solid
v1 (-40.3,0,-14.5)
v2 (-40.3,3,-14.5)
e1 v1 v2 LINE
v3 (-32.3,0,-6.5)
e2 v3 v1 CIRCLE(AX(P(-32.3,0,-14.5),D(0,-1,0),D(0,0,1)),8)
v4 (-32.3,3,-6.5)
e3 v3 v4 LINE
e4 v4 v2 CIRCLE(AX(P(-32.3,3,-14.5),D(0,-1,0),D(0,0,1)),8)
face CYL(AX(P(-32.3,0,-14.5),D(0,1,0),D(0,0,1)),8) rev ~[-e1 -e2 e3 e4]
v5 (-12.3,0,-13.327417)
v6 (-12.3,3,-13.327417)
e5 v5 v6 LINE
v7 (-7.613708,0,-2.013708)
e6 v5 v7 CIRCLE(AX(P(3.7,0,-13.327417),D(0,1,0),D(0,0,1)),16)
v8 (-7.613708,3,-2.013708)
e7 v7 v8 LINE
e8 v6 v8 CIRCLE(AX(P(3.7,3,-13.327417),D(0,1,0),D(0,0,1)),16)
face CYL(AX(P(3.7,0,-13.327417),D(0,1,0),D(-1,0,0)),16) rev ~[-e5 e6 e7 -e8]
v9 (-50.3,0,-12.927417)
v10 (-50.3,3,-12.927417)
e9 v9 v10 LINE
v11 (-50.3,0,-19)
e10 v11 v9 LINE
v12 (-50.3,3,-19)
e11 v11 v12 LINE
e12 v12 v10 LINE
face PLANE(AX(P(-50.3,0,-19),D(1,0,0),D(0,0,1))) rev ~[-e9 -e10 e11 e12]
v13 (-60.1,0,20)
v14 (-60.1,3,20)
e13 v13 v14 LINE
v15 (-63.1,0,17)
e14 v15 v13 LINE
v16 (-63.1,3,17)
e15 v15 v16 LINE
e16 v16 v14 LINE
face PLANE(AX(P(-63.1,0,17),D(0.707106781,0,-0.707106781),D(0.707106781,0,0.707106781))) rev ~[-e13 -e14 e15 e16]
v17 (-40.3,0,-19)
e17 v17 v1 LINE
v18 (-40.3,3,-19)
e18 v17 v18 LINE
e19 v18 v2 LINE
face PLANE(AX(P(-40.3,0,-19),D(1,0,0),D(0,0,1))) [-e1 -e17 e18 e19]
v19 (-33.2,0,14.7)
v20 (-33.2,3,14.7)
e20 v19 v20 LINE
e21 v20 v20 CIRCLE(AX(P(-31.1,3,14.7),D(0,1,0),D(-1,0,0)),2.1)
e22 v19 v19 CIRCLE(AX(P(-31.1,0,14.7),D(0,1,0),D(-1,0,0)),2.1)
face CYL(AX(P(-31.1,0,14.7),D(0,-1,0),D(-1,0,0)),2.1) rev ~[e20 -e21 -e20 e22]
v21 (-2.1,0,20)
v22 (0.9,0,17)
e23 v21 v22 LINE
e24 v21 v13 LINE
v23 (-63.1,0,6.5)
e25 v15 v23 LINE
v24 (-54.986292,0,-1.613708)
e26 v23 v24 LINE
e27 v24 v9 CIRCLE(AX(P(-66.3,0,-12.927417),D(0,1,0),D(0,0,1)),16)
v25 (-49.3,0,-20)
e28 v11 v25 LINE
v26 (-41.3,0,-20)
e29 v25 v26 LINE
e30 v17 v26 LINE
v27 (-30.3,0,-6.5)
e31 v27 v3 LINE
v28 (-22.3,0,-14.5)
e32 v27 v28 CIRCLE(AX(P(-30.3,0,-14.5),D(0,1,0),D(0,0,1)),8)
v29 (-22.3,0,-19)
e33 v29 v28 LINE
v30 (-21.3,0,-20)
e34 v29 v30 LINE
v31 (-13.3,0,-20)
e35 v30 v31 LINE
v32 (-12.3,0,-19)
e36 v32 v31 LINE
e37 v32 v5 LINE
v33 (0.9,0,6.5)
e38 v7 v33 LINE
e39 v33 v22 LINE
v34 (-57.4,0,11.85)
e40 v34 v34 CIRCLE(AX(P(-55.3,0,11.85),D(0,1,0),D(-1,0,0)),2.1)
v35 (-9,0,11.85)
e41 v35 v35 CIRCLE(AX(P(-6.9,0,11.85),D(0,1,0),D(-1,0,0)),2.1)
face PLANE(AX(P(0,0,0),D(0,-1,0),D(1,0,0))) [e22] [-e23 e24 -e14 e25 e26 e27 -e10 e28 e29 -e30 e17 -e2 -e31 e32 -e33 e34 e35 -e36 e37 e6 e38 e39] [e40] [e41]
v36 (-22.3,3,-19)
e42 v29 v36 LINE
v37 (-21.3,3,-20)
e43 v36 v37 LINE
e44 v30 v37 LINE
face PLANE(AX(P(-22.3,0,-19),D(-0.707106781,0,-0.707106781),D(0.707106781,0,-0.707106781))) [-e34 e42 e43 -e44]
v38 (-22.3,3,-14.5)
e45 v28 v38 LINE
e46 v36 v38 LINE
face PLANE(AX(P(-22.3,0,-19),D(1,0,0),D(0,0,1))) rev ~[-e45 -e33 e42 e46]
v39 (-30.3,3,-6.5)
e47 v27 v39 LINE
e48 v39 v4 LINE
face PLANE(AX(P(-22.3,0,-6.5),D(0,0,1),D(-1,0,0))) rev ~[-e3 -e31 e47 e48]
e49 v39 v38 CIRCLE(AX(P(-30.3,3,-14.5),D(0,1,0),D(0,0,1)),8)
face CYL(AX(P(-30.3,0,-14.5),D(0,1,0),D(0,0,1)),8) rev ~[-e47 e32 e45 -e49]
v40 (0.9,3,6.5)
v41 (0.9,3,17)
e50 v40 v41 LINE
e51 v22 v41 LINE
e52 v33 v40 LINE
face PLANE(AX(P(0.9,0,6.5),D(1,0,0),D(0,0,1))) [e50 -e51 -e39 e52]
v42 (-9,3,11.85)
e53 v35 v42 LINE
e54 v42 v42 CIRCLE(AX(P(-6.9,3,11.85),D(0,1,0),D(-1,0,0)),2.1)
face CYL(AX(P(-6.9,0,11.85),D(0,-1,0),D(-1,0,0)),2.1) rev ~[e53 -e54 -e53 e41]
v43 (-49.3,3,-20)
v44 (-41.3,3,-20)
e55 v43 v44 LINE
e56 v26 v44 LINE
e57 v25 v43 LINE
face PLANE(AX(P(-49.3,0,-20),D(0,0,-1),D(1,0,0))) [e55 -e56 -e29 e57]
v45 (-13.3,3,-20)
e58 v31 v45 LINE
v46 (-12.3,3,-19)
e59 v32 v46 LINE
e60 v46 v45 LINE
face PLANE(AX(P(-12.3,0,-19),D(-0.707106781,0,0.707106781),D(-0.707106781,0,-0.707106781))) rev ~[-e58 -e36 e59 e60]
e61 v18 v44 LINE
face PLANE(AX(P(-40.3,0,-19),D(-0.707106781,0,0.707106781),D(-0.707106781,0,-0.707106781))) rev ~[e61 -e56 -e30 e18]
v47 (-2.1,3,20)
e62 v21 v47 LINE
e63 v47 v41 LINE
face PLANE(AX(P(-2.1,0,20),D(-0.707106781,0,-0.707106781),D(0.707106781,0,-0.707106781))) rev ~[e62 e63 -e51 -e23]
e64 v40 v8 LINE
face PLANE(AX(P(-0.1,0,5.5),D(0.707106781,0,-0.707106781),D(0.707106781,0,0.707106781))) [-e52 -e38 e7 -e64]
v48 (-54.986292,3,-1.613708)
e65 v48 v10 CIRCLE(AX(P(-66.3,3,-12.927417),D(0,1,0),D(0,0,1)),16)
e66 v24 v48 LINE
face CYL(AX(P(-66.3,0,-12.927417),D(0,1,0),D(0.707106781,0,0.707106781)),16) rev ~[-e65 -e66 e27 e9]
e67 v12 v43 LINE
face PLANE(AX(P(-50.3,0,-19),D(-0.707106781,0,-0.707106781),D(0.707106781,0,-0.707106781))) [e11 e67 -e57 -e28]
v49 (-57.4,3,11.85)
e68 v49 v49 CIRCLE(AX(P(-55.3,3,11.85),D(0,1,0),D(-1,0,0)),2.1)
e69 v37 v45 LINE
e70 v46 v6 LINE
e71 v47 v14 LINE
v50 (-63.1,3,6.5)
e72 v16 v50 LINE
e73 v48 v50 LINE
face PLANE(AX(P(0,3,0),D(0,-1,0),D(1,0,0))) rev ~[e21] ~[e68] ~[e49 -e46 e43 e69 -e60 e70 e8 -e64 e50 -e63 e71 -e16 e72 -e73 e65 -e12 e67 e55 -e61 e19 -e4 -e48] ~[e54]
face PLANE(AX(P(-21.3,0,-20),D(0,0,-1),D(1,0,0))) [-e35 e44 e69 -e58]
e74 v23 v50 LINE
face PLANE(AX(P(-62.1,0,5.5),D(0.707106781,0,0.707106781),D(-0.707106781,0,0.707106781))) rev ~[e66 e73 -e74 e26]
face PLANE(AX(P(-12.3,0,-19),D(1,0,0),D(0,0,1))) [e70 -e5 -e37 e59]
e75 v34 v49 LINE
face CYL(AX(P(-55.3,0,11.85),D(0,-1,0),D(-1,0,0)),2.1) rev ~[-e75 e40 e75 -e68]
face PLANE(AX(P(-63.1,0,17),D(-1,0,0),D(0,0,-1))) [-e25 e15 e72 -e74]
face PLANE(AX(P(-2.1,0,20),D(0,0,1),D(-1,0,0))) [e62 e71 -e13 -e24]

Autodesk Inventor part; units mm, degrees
ref_plane "YZ Plane" through (0, 0, 0) normal (1, 0, 0) x (0, 1, 0)
ref_plane "XZ Plane" through (0, 0, 0) normal (0, 1, 0) x (-1, 0, 0)
ref_plane "XY Plane" through (0, 0, 0) normal (0, 0, 1) x (1, 0, 0)
sketch "スケッチ3" plane through (0, 0, 0) normal (0, 1, 0) x (-1, 0, 0)
  circle A0 centre (55.3, 11.85) radius 2.1
  circle A1 centre (31.1, 14.7) radius 2.1
  circle A2 centre (6.9, 11.85) radius 2.1
  line L0 (62.1, 5.5) -> (0.1, 5.5)
  line L1 (2.1, 20) -> (60.1, 20)
  line L2 (-0.9, 6.5) -> (-0.9, 17)
  line L3 (63.1, 17) -> (63.1, 6.5)
  line L4 (49.3, -20) -> (41.3, -20)
  line L5 (21.3, -20) -> (13.3, -20)
  line L6 (63.1, 17) -> (60.1, 20)
  line L7 (2.1, 20) -> (-0.9, 17)
  line L8 (50.3, -19) -> (50.3, 5.5)
  line L9 (40.3, -19) -> (40.3, 5.5)
  line L10 (22.3, -19) -> (22.3, 5.5)
  line L11 (12.3, -19) -> (12.3, 5.5)
  line L12 (62.1, 5.5) -> (63.1, 6.5)
  line L13 (0.1, 5.5) -> (-0.9, 6.5)
  line L14 (12.3, -19) -> (13.3, -20)
  line L15 (22.3, -19) -> (21.3, -20)
  line L16 (40.3, -19) -> (41.3, -20)
  line L17 (50.3, -19) -> (49.3, -20)
  point P0 (0, 0)
  point P1 (-0.9, 20)
  point P2 (-0.9, 5.5)
  point P3 (63.1, 5.5)
  point P4 (50.3, -20)
  point P5 (40.3, -20)
  point P6 (22.3, -20)
  point P7 (12.3, -20)
  point P8 (61.6, 18.5)
  dimension "d2" = 3
  dimension "d3" = 3
  dimension "d4" = 4.2
  dimension "d5" = 4.2
  dimension "d6" = 4.2
  dimension "d7" = 10
  dimension "d8" = 10
  dimension "d11" = 1
  dimension "d12" = 1
  dimension "d13" = 1
  dimension "d14" = 1
  dimension "d16" = 1
  dimension "d17" = 1
  dimension "d18" = 1
  dimension "d19" = 1
  dimension "d20" = 1
  dimension "d21" = 1
  dimension "d22" = 1
extrude "押し出し1" add sketch "スケッチ3" along normal blind 3
sketch "スケッチ4" plane through (0, 0, 0) normal (0, -1, 0) x (1, 0, 0)
  line L0 (-40.3, 5.5) -> (-22.3, 5.5)
  line L1 (-22.3, 5.5) -> (-22.3, -6.5)
  line L2 (-22.3, -6.5) -> (-40.3, -6.5)
  line L3 (-40.3, -6.5) -> (-40.3, 5.5)
  line L4 (-22.3, -19) -> (-22.3, 5.5) projected
  point P0 (0, 0)
  dimension "d23" = 12
extrude "押し出し2" add sketch "スケッチ4" against normal blind 3
sketch "スケッチ5" plane through (0, 0, 0) normal (0, -1, 0) x (1, 0, 0)
  line L0 (-0.1, 5.5) -> (-12.3, 5.5)
  line L1 (-12.3, 5.5) -> (-12.3, -6.7)
  line L2 (-12.3, -6.7) -> (-0.1, 5.5)
  line L3 (0.9, 6.5) -> (-0.1, 5.5) projected
  line L4 (-50.3, -6.3) -> (-50.3, 5.5)
  line L5 (-50.3, 5.5) -> (-62.1, 5.5)
  line L6 (-62.1, 5.5) -> (-50.3, -6.3)
  line L7 (-62.1, 5.5) -> (-63.1, 6.5) projected
  point P0 (0, 0)
extrude "押し出し3" add sketch "スケッチ5" against normal blind 3
fillet "フィレット2" radius 8 2 edges at (-22.3, 1.5, -6.5) (-40.3, 1.5, -6.5)
fillet "フィレット2" radius 16 2 edges at (-12.3, 1.5, -6.7) (-50.3, 1.5, -6.3)
equation "\"d2\" = d0"
equation "\"d3\" = d2"
equation "\"d7\" = d8"
equation "\"d12\" = d11"
equation "\"d13\" = d11"
equation "\"d14\" = d13"
equation "\"d16\" = d15"
equation "\"d17\" = d11"
equation "\"d18\" = d17"
equation "\"d19\" = d11"
equation "\"d20\" = d19"
equation "\"d21\" = d11"
equation "\"d22\" = d21"
equation "\"d15\" = d11"
equation "\"d0\" = 3"
properties part number "stopperver2_2"
